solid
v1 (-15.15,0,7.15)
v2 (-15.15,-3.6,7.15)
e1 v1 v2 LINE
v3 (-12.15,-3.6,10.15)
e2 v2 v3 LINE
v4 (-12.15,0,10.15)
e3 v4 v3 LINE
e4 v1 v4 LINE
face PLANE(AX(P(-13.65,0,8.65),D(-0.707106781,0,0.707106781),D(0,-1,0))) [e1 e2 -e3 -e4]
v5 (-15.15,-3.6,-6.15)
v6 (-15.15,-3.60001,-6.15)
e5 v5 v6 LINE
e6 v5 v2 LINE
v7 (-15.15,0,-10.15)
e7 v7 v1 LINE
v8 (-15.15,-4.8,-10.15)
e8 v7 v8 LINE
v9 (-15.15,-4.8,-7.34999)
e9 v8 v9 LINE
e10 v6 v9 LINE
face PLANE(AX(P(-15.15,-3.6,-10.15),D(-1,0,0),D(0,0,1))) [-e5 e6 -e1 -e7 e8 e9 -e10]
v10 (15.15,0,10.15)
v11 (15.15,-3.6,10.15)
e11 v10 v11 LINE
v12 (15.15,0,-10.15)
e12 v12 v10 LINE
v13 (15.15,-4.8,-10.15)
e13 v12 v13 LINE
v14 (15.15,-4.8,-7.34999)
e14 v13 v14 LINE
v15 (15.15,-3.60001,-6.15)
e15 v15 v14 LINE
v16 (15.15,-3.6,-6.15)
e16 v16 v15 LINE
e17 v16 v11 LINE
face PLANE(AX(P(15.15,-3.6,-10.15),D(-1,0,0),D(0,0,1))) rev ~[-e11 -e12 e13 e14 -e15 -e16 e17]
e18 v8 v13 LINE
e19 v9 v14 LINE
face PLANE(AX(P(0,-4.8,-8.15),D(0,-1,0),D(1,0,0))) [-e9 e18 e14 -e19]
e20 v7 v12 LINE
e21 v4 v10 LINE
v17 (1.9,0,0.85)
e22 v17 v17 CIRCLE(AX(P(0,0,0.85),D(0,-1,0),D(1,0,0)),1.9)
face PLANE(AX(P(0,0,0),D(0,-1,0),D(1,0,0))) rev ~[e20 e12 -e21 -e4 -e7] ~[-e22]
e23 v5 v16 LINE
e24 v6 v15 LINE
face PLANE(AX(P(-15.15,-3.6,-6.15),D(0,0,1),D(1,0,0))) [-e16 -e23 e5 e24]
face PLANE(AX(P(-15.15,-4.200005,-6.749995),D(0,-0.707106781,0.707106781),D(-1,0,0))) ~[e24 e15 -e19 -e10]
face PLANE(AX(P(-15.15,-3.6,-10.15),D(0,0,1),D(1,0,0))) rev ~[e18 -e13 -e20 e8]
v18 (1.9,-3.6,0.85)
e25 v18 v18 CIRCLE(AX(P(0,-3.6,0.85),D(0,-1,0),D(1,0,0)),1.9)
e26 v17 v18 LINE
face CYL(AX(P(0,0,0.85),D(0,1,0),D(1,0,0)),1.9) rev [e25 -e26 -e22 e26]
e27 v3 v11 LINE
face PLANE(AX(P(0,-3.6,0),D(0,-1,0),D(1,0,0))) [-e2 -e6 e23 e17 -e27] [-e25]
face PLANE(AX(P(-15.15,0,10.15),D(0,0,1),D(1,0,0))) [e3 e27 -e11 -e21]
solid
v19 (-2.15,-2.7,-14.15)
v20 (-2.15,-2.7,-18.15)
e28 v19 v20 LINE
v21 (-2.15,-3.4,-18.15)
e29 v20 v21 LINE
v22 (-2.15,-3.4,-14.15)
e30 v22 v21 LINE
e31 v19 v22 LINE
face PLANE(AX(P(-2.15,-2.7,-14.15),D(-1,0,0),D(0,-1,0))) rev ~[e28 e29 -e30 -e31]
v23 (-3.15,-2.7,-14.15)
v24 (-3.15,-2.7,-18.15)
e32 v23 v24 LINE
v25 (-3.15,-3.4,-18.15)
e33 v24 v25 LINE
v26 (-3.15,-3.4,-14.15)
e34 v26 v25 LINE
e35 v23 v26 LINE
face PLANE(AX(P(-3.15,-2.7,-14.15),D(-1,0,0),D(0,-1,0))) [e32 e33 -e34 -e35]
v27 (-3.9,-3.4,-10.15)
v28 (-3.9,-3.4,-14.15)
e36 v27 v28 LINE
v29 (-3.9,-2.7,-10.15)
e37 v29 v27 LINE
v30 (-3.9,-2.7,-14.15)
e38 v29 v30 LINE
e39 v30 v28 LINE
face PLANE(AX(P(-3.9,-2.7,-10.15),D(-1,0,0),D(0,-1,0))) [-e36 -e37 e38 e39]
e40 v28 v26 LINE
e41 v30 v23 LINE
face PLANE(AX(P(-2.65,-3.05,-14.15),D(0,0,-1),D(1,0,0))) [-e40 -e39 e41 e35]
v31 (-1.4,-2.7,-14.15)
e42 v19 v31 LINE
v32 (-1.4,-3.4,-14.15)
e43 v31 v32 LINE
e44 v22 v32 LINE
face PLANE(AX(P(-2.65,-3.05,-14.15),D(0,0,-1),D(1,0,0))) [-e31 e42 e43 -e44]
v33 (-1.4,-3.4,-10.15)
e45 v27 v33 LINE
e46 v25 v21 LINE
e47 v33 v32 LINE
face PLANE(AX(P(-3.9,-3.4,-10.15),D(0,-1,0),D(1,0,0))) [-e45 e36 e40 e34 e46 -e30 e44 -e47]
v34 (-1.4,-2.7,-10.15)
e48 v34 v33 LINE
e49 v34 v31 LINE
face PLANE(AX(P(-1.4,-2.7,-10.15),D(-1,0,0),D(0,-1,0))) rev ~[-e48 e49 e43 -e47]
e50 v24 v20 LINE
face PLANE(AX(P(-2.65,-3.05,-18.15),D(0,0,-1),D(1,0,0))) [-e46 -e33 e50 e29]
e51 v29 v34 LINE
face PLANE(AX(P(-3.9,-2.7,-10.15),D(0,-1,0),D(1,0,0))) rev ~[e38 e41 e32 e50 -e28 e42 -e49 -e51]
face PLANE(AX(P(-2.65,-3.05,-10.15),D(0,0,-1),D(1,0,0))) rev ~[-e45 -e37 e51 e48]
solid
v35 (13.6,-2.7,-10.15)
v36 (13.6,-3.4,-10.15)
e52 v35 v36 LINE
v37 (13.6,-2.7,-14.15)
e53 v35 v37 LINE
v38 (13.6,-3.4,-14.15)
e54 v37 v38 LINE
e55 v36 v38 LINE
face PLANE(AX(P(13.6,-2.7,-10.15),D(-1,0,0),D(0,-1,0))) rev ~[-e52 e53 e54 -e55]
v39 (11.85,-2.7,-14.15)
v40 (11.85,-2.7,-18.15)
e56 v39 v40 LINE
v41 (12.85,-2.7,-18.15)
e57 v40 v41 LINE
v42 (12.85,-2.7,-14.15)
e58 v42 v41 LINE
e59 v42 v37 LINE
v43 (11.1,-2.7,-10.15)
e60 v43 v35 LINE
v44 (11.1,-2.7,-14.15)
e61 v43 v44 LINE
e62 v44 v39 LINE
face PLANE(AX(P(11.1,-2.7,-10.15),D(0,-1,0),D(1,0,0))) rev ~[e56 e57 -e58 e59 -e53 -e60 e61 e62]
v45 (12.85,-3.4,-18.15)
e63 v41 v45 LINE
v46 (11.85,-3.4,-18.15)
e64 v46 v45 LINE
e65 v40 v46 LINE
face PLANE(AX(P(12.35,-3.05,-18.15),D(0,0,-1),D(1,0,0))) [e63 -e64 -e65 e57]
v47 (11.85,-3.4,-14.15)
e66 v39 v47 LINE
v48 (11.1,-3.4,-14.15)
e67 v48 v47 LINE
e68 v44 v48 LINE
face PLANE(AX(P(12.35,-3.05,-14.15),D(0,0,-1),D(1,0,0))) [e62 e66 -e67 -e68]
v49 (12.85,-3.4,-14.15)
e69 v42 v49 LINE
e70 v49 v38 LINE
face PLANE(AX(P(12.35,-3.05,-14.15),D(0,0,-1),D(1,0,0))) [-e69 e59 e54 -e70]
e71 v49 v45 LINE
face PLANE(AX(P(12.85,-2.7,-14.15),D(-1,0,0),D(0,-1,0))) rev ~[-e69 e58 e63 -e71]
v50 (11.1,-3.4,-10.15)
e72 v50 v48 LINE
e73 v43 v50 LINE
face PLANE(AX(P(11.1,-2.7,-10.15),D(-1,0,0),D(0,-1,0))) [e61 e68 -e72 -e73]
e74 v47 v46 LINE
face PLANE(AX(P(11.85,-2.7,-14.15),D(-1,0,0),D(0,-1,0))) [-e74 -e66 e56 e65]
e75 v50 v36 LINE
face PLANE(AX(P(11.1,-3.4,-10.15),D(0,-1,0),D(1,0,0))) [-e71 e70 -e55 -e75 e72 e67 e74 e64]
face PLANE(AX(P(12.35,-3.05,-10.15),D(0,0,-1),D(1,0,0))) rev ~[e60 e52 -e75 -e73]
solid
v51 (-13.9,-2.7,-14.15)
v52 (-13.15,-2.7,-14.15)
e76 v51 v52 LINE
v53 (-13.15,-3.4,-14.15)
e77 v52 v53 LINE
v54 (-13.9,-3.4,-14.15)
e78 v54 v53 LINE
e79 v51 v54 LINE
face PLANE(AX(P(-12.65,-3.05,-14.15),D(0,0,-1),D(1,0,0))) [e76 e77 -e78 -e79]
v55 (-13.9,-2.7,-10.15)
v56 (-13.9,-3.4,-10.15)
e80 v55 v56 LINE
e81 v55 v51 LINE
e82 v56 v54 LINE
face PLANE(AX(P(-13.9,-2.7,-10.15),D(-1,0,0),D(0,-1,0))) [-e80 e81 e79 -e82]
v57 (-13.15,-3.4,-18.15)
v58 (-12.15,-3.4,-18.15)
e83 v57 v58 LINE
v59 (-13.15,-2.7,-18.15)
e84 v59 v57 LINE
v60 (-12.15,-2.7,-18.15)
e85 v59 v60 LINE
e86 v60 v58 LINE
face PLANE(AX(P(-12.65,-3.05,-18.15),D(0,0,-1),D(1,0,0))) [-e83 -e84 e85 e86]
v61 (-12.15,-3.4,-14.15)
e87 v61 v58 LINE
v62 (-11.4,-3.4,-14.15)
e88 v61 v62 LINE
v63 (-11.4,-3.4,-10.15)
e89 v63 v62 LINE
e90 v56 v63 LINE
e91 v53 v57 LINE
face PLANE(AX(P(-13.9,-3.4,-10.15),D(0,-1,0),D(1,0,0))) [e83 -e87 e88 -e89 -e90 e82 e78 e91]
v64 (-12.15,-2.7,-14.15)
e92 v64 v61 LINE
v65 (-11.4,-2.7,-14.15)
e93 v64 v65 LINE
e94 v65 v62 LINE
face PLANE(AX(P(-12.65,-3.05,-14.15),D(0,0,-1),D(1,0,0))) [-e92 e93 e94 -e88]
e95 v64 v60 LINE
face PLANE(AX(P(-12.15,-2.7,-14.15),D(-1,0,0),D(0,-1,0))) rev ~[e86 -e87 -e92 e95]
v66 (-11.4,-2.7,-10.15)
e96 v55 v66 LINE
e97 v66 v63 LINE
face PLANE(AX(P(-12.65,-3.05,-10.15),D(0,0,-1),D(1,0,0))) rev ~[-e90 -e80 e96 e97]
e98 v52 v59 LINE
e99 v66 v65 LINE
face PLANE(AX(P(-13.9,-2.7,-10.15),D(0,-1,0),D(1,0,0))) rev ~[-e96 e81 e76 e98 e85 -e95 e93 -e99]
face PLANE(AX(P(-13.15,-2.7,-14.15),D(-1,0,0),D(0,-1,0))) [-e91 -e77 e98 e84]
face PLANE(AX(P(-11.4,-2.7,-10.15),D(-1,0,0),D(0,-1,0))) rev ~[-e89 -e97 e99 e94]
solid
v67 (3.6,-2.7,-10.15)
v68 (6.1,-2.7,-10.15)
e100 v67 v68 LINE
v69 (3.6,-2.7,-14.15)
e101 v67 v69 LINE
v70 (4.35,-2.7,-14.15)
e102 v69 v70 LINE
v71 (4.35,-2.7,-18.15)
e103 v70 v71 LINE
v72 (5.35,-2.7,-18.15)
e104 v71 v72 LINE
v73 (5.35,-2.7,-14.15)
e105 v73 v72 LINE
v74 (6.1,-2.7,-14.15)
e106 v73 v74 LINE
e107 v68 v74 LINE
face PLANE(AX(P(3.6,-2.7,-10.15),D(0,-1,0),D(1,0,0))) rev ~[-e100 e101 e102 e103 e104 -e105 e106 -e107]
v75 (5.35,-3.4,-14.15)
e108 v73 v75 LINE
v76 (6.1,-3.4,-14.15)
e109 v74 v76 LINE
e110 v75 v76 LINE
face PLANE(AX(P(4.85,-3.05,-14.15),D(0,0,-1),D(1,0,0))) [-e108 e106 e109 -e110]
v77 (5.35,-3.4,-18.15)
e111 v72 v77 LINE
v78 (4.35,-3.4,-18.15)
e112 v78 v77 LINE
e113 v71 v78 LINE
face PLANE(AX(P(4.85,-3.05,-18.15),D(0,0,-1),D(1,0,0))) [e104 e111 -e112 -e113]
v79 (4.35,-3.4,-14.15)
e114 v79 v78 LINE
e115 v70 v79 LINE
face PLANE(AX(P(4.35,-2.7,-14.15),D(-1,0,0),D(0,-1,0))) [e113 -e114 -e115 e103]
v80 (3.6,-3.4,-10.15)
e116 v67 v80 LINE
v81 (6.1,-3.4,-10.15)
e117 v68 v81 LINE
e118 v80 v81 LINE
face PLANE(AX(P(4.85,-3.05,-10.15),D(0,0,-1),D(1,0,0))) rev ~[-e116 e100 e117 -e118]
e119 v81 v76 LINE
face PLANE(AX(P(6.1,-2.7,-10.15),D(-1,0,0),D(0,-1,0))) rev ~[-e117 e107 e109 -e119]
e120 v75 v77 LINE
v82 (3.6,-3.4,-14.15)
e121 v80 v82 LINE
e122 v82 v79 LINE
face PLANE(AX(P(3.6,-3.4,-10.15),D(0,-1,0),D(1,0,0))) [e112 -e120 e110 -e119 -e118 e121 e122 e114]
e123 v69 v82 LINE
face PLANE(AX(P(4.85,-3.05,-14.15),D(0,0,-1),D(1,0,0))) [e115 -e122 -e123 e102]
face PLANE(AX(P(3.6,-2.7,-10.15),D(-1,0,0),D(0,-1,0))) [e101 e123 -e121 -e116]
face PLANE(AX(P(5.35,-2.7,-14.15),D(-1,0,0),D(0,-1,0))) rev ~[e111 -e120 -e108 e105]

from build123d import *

# Parameters (mm, degrees)
F0_W     = 30.3
F0_H     = 20.3
F0_R     = 1.9
F1_DEPTH = 3.6
F2_W     = 30.3
F2_H     = 4
F3_DEPTH = 1.2
F4_SIZE  = 1.19999
F5_SIZE  = 3
F6_W     = 2.5
F6_H     = 0.7
F7_DEPTH = 4
F8_W     = 1
F8_H     = 0.7
F9_DEPTH = 4


# Not quite as in the source:
# - a fillet or chamfer is up to 0.001 mm smaller than in the source, because OpenCascade refuses the exact size


with BuildPart() as f1:
    # F0 (on Front) → F1 (new body)
    with BuildSketch(Plane.XZ):
        Rectangle(F0_W, F0_H)
        with Locations((0, 0.85)):
            Circle(F0_R, mode=Mode.SUBTRACT)
    extrude(amount=F1_DEPTH)

    # F2 (on face) → F3 (join)
    with BuildSketch(Plane.XZ.offset(3.6)):
        with Locations((0, -8.15)):
            Rectangle(F2_W, F2_H)
    extrude(amount=F3_DEPTH)

    # F4 (size 1.2 in the source; OpenCascade refuses exactly that, so slightly less here)
    f4_edges = [f1.edges().sort_by_distance(p)[0] for p in [
        (0, -4.8, -6.15),
    ]]
    chamfer(f4_edges, length=F4_SIZE)

    # F5
    f5_edges = [f1.edges().sort_by_distance(p)[0] for p in [
        (-15.15, -1.8, 10.15),
    ]]
    chamfer(f5_edges, length=F5_SIZE)


with BuildPart() as f7:
    # F6 (on face) → F7 (new body)
    with BuildSketch(Plane(origin=(0, 0, -10.15), x_dir=(1, 0, 0), z_dir=(0, 0, -1))):
        with Locations((-12.65, 3.05)):
            Rectangle(F6_W, F6_H)
    extrude(amount=F7_DEPTH)

    # F8 (on face) → F9 (join)
    with BuildSketch(Plane(origin=(0, 0, -14.15), x_dir=(1, 0, 0), z_dir=(0, 0, -1))):
        with Locations((-12.65, 3.05)):
            Rectangle(F8_W, F8_H)
    extrude(amount=F9_DEPTH)


with BuildPart() as f7b:
    # F6 (on face) → F7, piece 2 (new body)
    with BuildSketch(Plane(origin=(0, 0, -10.15), x_dir=(1, 0, 0), z_dir=(0, 0, -1))):
        with Locations((4.85, 3.05)):
            Rectangle(F6_W, F6_H)
    extrude(amount=F7_DEPTH)

    # F8 (on face) → F9, piece 3 (join)
    with BuildSketch(Plane(origin=(0, 0, -14.15), x_dir=(1, 0, 0), z_dir=(0, 0, -1))):
        with Locations((4.85, 3.05)):
            Rectangle(F8_W, F8_H)
    extrude(amount=F9_DEPTH)


with BuildPart() as f7c:
    # F6 (on face) → F7, piece 3 (new body)
    with BuildSketch(Plane(origin=(0, 0, -10.15), x_dir=(1, 0, 0), z_dir=(0, 0, -1))):
        with Locations((12.35, 3.05)):
            Rectangle(F6_W, F6_H)
    extrude(amount=F7_DEPTH)

    # F8 (on face) → F9, piece 4 (join)
    with BuildSketch(Plane(origin=(0, 0, -14.15), x_dir=(1, 0, 0), z_dir=(0, 0, -1))):
        with Locations((12.35, 3.05)):
            Rectangle(F8_W, F8_H)
    extrude(amount=F9_DEPTH)


with BuildPart() as f7d:
    # F6 (on face) → F7, piece 4 (new body)
    with BuildSketch(Plane(origin=(0, 0, -10.15), x_dir=(1, 0, 0), z_dir=(0, 0, -1))):
        with Locations((-2.65, 3.05)):
            Rectangle(F6_W, F6_H)
    extrude(amount=F7_DEPTH)

    # F8 (on face) → F9, piece 2 (join)
    with BuildSketch(Plane(origin=(0, 0, -14.15), x_dir=(1, 0, 0), z_dir=(0, 0, -1))):
        with Locations((-2.65, 3.05)):
            Rectangle(F8_W, F8_H)
    extrude(amount=F9_DEPTH)


solid = Compound([f1.part, f7.part, f7b.part, f7c.part, f7d.part])
